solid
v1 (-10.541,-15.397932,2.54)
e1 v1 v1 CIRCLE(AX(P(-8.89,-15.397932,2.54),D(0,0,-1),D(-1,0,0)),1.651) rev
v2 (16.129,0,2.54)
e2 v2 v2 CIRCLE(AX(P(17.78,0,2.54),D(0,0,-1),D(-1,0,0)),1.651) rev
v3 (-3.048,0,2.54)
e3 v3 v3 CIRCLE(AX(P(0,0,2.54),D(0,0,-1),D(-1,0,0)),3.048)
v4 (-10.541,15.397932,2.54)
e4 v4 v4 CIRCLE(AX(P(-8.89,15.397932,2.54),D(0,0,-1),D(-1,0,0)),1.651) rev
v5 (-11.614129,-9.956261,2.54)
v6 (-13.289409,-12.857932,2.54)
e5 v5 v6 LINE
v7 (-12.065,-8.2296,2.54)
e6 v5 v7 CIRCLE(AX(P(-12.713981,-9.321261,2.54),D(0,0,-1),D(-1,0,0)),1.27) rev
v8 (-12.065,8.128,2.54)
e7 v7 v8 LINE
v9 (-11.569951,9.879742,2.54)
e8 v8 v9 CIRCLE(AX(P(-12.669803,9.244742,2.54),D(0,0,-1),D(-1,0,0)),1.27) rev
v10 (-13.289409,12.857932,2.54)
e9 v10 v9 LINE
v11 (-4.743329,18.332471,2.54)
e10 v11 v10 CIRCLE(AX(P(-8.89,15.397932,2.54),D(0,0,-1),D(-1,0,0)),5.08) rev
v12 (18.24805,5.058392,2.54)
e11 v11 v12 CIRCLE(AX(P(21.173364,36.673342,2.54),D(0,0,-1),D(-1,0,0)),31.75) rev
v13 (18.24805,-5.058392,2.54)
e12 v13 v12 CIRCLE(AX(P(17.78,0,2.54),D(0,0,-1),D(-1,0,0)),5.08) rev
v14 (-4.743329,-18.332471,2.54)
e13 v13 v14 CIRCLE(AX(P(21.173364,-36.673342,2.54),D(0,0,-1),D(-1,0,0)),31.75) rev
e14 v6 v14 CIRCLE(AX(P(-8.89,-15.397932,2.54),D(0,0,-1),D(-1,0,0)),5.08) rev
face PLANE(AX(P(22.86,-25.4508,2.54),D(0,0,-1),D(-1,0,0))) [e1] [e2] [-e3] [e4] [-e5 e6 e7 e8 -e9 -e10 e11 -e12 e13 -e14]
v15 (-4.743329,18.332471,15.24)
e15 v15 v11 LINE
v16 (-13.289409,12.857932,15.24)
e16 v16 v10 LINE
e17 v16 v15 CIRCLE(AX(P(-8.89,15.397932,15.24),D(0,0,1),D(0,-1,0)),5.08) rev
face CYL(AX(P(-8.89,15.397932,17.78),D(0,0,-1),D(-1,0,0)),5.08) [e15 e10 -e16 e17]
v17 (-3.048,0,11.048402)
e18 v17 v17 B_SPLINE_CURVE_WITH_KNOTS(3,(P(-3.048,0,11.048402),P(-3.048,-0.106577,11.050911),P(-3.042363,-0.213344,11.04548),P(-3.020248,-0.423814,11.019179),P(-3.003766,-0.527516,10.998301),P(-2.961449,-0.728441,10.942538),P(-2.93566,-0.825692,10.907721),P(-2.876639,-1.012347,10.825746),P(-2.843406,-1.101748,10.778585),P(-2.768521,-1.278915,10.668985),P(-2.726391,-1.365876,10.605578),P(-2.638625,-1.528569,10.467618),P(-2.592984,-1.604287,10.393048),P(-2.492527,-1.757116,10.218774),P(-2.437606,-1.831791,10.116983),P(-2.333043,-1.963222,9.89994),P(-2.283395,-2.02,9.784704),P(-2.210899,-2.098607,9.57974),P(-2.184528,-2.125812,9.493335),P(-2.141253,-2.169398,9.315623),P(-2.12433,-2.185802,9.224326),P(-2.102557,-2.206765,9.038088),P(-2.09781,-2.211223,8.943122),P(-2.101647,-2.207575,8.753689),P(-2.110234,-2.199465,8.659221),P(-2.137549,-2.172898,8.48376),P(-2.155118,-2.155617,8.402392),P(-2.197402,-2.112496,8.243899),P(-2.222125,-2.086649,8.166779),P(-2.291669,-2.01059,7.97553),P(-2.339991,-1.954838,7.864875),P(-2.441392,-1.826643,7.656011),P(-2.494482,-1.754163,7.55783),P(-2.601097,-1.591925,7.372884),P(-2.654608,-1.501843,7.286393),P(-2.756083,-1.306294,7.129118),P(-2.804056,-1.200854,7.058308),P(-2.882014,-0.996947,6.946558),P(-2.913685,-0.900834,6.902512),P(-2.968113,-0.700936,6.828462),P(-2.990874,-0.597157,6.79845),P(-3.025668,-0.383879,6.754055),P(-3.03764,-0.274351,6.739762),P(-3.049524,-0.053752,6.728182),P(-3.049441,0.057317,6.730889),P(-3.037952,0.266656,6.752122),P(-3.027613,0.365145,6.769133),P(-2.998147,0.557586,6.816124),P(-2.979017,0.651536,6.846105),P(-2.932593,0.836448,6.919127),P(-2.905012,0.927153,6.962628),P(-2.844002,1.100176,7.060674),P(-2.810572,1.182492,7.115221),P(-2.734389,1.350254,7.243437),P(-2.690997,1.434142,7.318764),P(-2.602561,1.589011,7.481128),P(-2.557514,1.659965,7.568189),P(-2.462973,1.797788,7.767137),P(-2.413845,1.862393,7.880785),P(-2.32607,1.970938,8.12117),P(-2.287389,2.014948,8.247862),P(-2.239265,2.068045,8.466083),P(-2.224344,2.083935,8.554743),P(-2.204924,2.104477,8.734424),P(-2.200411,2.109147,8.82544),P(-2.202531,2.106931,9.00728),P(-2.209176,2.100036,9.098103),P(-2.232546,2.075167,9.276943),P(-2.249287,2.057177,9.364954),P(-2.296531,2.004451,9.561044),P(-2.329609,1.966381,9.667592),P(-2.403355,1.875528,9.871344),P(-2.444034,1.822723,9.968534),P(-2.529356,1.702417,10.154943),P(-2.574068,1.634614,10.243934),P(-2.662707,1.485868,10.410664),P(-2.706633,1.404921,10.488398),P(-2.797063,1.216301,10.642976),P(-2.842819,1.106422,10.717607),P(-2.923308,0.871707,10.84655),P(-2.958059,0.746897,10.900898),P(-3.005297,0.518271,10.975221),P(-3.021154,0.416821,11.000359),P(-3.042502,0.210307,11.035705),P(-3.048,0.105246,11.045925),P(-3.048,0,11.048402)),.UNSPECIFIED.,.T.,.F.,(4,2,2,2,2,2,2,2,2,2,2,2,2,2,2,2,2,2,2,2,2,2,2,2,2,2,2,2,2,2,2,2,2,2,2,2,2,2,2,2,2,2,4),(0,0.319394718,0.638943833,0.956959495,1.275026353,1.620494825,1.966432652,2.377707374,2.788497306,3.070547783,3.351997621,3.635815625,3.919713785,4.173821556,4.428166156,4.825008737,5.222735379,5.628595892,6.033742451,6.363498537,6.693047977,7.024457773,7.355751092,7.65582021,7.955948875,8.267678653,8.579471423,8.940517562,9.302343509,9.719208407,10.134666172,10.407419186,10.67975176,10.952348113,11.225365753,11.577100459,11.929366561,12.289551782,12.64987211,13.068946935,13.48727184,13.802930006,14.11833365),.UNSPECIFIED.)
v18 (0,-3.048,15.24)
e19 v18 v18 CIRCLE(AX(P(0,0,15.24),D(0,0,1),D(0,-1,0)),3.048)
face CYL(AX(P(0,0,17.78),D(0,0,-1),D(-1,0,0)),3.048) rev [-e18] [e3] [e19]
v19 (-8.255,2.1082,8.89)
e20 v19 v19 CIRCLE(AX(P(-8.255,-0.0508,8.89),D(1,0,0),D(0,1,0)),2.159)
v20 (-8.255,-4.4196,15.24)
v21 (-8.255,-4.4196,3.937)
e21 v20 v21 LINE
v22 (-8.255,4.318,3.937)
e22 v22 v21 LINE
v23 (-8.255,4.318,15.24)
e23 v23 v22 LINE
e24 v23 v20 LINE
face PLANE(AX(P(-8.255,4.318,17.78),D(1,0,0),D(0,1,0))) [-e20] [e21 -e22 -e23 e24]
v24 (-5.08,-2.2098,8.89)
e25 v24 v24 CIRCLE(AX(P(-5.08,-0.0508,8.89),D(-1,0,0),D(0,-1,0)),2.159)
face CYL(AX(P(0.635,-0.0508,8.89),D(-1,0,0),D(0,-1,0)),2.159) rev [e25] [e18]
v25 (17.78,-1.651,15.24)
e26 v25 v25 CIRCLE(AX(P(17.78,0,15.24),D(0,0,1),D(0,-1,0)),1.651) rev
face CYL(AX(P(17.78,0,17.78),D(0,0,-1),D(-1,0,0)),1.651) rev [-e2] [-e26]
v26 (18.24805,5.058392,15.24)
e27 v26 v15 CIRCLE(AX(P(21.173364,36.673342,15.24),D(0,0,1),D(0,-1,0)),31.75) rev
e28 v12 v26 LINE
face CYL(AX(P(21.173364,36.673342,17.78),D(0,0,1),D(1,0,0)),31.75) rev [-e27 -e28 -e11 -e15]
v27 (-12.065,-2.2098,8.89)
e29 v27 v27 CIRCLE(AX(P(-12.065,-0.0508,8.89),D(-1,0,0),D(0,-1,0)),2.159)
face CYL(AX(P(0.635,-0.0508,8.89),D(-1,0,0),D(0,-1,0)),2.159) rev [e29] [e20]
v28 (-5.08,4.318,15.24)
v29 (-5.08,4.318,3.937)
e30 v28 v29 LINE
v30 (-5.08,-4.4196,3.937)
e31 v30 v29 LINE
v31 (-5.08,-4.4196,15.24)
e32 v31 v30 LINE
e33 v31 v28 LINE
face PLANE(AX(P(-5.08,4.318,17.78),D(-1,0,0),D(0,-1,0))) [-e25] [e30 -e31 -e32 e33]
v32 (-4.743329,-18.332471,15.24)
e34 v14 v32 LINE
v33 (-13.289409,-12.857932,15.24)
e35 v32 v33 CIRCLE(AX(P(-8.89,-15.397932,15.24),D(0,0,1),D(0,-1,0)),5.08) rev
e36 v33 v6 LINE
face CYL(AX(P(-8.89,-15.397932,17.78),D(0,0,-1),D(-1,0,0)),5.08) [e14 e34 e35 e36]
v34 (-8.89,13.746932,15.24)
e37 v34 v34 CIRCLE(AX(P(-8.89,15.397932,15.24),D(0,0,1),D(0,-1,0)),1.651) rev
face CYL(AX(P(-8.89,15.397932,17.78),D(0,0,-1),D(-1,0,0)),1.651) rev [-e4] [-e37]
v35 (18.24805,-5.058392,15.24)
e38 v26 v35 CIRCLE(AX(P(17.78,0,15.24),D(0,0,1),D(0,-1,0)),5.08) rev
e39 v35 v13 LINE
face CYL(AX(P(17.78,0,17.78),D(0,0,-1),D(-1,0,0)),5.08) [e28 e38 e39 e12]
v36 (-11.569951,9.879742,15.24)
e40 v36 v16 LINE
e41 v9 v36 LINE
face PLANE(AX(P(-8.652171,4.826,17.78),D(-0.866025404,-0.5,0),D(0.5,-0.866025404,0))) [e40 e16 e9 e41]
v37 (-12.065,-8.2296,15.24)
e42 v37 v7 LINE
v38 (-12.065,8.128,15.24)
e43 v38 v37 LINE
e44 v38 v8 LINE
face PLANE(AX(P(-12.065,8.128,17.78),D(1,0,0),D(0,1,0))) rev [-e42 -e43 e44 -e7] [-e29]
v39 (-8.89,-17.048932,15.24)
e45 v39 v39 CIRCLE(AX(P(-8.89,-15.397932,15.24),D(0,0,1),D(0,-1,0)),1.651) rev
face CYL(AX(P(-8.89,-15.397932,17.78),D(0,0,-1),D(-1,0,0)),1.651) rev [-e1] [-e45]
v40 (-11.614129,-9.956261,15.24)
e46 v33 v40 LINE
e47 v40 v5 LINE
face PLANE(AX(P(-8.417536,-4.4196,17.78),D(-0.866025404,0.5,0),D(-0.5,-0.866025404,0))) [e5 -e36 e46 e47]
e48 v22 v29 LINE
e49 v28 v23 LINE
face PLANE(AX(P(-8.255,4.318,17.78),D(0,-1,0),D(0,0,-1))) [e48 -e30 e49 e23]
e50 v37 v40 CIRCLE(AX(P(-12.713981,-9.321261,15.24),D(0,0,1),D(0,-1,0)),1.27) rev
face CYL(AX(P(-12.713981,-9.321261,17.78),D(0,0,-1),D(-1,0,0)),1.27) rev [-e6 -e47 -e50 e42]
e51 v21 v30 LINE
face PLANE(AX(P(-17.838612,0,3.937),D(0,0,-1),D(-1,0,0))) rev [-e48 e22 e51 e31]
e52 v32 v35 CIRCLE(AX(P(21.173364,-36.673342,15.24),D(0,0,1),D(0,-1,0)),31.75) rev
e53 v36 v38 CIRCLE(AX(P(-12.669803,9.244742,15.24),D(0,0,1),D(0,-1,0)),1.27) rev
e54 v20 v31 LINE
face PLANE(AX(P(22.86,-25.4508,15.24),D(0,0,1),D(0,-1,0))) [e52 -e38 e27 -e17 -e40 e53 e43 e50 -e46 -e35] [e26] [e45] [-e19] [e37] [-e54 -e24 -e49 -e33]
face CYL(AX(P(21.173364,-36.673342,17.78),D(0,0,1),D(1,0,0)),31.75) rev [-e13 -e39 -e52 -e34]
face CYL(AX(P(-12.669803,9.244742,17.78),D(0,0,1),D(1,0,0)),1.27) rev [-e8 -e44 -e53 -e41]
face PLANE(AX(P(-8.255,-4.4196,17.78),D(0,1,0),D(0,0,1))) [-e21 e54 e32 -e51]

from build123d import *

# Parameters (mm, degrees)
SKETCH1_R               = 3.048
SKETCH1_W               = 3.175
SKETCH1_H               = 8.7376
BOSS_EXTRUDE1_DEPTH     = 17.78
SKETCH3_W               = 3.937
SKETCH3_H               = 8.7376
BOSS_EXTRUDE2_DEPTH     = 3.175
SKETCH5_R               = 1.651
SKETCH5_R_2             = 3.048
BOSS_EXTRUDE3_DEPTH     = 17.78
FILLET1_R               = 31.75
FILLET2_R               = 1.27
SKETCH2_R               = 2.159
CUT_EXTRUDE2_DEPTH      = 12.7
CUT_EXTRUDE3_DEPTH      = 45.217979663
CUT_EXTRUDE3_DEPTH_BACK = 45.217979663
SKETCH7_W               = 24.098797772
SKETCH7_H               = 63.864925988
SKETCH7_W_2             = 12.7
SKETCH7_H_2             = 50.8


with BuildPart() as part:
    # Sketch1 → Boss-Extrude1 (new body)
    with BuildSketch(Plane.XY):
        with BuildLine():
            Line((-12.065, 8.128), (-1.27, 8.128))
            Line((-1.27, 8.128), (3.448633975, 4.557208434))
            ThreePointArc((3.448633975, 4.557208434), (5.712149959, 0.180465622), (3.72942373, -4.33042996))
            Line((3.72942373, -4.33042996), (-1.27, -8.2296))
            Line((-1.27, -8.2296), (-12.065, -8.2296))
            Line((-12.065, -8.2296), (-12.065, 8.128))
        make_face()
        Circle(SKETCH1_R, mode=Mode.SUBTRACT)
        with Locations((-6.6675, -0.0508)):
            Rectangle(SKETCH1_W, SKETCH1_H, mode=Mode.SUBTRACT)
    extrude(amount=BOSS_EXTRUDE1_DEPTH)

    # Sketch3 → Boss-Extrude2 (add)
    with BuildSketch(Plane.ZY.offset(5.08)):
        with Locations((1.9685, -0.0508)):
            Rectangle(SKETCH3_W, SKETCH3_H)
    extrude(amount=BOSS_EXTRUDE2_DEPTH)

    # Sketch5 → Boss-Extrude3 (add)
    with BuildSketch(Plane(origin=(0, 0, 0), x_dir=(-1, 0, 0), z_dir=(0, 0, -1))):
        with BuildLine():
            Line((-2.932939367, 5.08), (4.490590949, 17.937931679))
            ThreePointArc((4.490590949, 17.937931679), (11.43, 19.797340731), (13.289409051, 12.857931679))
            Line((13.289409051, 12.857931679), (8.652171134, 4.826))
            Line((8.652171134, 4.826), (5.08, 4.826))
            Line((5.08, 4.826), (5.08, -4.4196))
            Line((5.08, -4.4196), (8.417535985, -4.4196))
            Line((8.417535985, -4.4196), (13.289409051, -12.857931679))
            ThreePointArc((13.289409051, -12.857931679), (11.43, -19.797340731), (4.490590949, -17.937931679))
            Line((4.490590949, -17.937931679), (-2.932939367, -5.08))
            Line((-2.932939367, -5.08), (-17.78, -5.08))
            ThreePointArc((-17.78, -5.08), (-22.86, 0), (-17.78, 5.08))
            Line((-17.78, 5.08), (-2.932939367, 5.08))
        make_face()
        with Locations((8.89, 15.397931679)):
            Circle(SKETCH5_R, mode=Mode.SUBTRACT)
        with Locations((8.89, -15.397931679)):
            Circle(SKETCH5_R, mode=Mode.SUBTRACT)
        with Locations((-17.78, 0)):
            Circle(SKETCH5_R, mode=Mode.SUBTRACT)
        with Locations(Location((0, 0, 0), (0, 0, 180))):
            Circle(SKETCH5_R_2, mode=Mode.SUBTRACT)
    extrude(amount=-BOSS_EXTRUDE3_DEPTH)

    # Fillet1
    fillet1_edges = [part.edges().sort_by_distance(p)[0] for p in [
        (2.932939367, -5.08, 8.89),
        (2.932939367, 5.08, 8.89),
    ]]
    fillet(fillet1_edges, radius=FILLET1_R)

    # Fillet2
    # the kernel refuses this fillet: 1.27 mm, written as the material it adds along each edge
    with BuildSketch(Plane(origin=(-10.558581723, 8.128, 17.78), x_dir=(-0.4999999999999911, 0.8660254037844438, 0), z_dir=(0, 0, -1))) as fillet2_piece_1:
        with BuildLine():
            CenterArc((2.022737824, -1.27), FILLET2_R, 90, 91.561006687)
            Line((0.753209139, -1.304596497), (0.727818565, -1.305288427))
            ThreePointArc((0.727818565, -1.305288427), (0.354607524, -0.664998248), (-0.021997045, -0.0127))
            Line((-0.021997045, -0.0127), (0, 0.0254))
            Line((0, 0.0254), (2.022737824, 0.0254))
            Line((2.022737824, 0.0254), (2.022737824, 0))
        make_face()
    extrude(amount=17.78)
    with BuildSketch(Plane(origin=(-10.61724051, -8.2296, 0), x_dir=(-1, 0, 0), z_dir=(0, 0, 1))) as fillet2_piece_2:
        with BuildLine():
            CenterArc((2.096740449, 1.091660989), FILLET2_R, 150, 89.268962563)
            Line((0.996888187, 1.726660989), (0.974891141, 1.739360989))
            Line((0.974891141, 1.739360989), (-0.021997045, 0.0127))
            Line((-0.021997045, 0.0127), (0, -0.0254))
            ThreePointArc((0, -0.0254), (0.723879745, -0.0254), (1.434779871, -0.02183322))
            Line((1.434779871, -0.02183322), (1.44775949, 0))
        make_face()
    extrude(amount=17.78)

    # Sketch2 → Cut-Extrude2 (cut)
    with BuildSketch(Plane.ZY.offset(12.065)):
        with Locations(Location((8.89, -0.0508, 0), (0, 0, 270))):
            Circle(SKETCH2_R)
    extrude(amount=-CUT_EXTRUDE2_DEPTH, mode=Mode.SUBTRACT)

    # Sketch7 → Cut-Extrude3 (cut, two sides: drawn at the far end of the back side and taken through both)
    with BuildSketch(Plane.ZY.offset(12.065).offset(-CUT_EXTRUDE3_DEPTH_BACK)):
        with Locations((8.89, -0.0508)):
            Rectangle(SKETCH7_W, SKETCH7_H)
        with Locations((8.89, -0.0508)):
            Rectangle(SKETCH7_W_2, SKETCH7_H_2, mode=Mode.SUBTRACT)
    extrude(amount=CUT_EXTRUDE3_DEPTH + CUT_EXTRUDE3_DEPTH_BACK, mode=Mode.SUBTRACT)


solid = part.part
